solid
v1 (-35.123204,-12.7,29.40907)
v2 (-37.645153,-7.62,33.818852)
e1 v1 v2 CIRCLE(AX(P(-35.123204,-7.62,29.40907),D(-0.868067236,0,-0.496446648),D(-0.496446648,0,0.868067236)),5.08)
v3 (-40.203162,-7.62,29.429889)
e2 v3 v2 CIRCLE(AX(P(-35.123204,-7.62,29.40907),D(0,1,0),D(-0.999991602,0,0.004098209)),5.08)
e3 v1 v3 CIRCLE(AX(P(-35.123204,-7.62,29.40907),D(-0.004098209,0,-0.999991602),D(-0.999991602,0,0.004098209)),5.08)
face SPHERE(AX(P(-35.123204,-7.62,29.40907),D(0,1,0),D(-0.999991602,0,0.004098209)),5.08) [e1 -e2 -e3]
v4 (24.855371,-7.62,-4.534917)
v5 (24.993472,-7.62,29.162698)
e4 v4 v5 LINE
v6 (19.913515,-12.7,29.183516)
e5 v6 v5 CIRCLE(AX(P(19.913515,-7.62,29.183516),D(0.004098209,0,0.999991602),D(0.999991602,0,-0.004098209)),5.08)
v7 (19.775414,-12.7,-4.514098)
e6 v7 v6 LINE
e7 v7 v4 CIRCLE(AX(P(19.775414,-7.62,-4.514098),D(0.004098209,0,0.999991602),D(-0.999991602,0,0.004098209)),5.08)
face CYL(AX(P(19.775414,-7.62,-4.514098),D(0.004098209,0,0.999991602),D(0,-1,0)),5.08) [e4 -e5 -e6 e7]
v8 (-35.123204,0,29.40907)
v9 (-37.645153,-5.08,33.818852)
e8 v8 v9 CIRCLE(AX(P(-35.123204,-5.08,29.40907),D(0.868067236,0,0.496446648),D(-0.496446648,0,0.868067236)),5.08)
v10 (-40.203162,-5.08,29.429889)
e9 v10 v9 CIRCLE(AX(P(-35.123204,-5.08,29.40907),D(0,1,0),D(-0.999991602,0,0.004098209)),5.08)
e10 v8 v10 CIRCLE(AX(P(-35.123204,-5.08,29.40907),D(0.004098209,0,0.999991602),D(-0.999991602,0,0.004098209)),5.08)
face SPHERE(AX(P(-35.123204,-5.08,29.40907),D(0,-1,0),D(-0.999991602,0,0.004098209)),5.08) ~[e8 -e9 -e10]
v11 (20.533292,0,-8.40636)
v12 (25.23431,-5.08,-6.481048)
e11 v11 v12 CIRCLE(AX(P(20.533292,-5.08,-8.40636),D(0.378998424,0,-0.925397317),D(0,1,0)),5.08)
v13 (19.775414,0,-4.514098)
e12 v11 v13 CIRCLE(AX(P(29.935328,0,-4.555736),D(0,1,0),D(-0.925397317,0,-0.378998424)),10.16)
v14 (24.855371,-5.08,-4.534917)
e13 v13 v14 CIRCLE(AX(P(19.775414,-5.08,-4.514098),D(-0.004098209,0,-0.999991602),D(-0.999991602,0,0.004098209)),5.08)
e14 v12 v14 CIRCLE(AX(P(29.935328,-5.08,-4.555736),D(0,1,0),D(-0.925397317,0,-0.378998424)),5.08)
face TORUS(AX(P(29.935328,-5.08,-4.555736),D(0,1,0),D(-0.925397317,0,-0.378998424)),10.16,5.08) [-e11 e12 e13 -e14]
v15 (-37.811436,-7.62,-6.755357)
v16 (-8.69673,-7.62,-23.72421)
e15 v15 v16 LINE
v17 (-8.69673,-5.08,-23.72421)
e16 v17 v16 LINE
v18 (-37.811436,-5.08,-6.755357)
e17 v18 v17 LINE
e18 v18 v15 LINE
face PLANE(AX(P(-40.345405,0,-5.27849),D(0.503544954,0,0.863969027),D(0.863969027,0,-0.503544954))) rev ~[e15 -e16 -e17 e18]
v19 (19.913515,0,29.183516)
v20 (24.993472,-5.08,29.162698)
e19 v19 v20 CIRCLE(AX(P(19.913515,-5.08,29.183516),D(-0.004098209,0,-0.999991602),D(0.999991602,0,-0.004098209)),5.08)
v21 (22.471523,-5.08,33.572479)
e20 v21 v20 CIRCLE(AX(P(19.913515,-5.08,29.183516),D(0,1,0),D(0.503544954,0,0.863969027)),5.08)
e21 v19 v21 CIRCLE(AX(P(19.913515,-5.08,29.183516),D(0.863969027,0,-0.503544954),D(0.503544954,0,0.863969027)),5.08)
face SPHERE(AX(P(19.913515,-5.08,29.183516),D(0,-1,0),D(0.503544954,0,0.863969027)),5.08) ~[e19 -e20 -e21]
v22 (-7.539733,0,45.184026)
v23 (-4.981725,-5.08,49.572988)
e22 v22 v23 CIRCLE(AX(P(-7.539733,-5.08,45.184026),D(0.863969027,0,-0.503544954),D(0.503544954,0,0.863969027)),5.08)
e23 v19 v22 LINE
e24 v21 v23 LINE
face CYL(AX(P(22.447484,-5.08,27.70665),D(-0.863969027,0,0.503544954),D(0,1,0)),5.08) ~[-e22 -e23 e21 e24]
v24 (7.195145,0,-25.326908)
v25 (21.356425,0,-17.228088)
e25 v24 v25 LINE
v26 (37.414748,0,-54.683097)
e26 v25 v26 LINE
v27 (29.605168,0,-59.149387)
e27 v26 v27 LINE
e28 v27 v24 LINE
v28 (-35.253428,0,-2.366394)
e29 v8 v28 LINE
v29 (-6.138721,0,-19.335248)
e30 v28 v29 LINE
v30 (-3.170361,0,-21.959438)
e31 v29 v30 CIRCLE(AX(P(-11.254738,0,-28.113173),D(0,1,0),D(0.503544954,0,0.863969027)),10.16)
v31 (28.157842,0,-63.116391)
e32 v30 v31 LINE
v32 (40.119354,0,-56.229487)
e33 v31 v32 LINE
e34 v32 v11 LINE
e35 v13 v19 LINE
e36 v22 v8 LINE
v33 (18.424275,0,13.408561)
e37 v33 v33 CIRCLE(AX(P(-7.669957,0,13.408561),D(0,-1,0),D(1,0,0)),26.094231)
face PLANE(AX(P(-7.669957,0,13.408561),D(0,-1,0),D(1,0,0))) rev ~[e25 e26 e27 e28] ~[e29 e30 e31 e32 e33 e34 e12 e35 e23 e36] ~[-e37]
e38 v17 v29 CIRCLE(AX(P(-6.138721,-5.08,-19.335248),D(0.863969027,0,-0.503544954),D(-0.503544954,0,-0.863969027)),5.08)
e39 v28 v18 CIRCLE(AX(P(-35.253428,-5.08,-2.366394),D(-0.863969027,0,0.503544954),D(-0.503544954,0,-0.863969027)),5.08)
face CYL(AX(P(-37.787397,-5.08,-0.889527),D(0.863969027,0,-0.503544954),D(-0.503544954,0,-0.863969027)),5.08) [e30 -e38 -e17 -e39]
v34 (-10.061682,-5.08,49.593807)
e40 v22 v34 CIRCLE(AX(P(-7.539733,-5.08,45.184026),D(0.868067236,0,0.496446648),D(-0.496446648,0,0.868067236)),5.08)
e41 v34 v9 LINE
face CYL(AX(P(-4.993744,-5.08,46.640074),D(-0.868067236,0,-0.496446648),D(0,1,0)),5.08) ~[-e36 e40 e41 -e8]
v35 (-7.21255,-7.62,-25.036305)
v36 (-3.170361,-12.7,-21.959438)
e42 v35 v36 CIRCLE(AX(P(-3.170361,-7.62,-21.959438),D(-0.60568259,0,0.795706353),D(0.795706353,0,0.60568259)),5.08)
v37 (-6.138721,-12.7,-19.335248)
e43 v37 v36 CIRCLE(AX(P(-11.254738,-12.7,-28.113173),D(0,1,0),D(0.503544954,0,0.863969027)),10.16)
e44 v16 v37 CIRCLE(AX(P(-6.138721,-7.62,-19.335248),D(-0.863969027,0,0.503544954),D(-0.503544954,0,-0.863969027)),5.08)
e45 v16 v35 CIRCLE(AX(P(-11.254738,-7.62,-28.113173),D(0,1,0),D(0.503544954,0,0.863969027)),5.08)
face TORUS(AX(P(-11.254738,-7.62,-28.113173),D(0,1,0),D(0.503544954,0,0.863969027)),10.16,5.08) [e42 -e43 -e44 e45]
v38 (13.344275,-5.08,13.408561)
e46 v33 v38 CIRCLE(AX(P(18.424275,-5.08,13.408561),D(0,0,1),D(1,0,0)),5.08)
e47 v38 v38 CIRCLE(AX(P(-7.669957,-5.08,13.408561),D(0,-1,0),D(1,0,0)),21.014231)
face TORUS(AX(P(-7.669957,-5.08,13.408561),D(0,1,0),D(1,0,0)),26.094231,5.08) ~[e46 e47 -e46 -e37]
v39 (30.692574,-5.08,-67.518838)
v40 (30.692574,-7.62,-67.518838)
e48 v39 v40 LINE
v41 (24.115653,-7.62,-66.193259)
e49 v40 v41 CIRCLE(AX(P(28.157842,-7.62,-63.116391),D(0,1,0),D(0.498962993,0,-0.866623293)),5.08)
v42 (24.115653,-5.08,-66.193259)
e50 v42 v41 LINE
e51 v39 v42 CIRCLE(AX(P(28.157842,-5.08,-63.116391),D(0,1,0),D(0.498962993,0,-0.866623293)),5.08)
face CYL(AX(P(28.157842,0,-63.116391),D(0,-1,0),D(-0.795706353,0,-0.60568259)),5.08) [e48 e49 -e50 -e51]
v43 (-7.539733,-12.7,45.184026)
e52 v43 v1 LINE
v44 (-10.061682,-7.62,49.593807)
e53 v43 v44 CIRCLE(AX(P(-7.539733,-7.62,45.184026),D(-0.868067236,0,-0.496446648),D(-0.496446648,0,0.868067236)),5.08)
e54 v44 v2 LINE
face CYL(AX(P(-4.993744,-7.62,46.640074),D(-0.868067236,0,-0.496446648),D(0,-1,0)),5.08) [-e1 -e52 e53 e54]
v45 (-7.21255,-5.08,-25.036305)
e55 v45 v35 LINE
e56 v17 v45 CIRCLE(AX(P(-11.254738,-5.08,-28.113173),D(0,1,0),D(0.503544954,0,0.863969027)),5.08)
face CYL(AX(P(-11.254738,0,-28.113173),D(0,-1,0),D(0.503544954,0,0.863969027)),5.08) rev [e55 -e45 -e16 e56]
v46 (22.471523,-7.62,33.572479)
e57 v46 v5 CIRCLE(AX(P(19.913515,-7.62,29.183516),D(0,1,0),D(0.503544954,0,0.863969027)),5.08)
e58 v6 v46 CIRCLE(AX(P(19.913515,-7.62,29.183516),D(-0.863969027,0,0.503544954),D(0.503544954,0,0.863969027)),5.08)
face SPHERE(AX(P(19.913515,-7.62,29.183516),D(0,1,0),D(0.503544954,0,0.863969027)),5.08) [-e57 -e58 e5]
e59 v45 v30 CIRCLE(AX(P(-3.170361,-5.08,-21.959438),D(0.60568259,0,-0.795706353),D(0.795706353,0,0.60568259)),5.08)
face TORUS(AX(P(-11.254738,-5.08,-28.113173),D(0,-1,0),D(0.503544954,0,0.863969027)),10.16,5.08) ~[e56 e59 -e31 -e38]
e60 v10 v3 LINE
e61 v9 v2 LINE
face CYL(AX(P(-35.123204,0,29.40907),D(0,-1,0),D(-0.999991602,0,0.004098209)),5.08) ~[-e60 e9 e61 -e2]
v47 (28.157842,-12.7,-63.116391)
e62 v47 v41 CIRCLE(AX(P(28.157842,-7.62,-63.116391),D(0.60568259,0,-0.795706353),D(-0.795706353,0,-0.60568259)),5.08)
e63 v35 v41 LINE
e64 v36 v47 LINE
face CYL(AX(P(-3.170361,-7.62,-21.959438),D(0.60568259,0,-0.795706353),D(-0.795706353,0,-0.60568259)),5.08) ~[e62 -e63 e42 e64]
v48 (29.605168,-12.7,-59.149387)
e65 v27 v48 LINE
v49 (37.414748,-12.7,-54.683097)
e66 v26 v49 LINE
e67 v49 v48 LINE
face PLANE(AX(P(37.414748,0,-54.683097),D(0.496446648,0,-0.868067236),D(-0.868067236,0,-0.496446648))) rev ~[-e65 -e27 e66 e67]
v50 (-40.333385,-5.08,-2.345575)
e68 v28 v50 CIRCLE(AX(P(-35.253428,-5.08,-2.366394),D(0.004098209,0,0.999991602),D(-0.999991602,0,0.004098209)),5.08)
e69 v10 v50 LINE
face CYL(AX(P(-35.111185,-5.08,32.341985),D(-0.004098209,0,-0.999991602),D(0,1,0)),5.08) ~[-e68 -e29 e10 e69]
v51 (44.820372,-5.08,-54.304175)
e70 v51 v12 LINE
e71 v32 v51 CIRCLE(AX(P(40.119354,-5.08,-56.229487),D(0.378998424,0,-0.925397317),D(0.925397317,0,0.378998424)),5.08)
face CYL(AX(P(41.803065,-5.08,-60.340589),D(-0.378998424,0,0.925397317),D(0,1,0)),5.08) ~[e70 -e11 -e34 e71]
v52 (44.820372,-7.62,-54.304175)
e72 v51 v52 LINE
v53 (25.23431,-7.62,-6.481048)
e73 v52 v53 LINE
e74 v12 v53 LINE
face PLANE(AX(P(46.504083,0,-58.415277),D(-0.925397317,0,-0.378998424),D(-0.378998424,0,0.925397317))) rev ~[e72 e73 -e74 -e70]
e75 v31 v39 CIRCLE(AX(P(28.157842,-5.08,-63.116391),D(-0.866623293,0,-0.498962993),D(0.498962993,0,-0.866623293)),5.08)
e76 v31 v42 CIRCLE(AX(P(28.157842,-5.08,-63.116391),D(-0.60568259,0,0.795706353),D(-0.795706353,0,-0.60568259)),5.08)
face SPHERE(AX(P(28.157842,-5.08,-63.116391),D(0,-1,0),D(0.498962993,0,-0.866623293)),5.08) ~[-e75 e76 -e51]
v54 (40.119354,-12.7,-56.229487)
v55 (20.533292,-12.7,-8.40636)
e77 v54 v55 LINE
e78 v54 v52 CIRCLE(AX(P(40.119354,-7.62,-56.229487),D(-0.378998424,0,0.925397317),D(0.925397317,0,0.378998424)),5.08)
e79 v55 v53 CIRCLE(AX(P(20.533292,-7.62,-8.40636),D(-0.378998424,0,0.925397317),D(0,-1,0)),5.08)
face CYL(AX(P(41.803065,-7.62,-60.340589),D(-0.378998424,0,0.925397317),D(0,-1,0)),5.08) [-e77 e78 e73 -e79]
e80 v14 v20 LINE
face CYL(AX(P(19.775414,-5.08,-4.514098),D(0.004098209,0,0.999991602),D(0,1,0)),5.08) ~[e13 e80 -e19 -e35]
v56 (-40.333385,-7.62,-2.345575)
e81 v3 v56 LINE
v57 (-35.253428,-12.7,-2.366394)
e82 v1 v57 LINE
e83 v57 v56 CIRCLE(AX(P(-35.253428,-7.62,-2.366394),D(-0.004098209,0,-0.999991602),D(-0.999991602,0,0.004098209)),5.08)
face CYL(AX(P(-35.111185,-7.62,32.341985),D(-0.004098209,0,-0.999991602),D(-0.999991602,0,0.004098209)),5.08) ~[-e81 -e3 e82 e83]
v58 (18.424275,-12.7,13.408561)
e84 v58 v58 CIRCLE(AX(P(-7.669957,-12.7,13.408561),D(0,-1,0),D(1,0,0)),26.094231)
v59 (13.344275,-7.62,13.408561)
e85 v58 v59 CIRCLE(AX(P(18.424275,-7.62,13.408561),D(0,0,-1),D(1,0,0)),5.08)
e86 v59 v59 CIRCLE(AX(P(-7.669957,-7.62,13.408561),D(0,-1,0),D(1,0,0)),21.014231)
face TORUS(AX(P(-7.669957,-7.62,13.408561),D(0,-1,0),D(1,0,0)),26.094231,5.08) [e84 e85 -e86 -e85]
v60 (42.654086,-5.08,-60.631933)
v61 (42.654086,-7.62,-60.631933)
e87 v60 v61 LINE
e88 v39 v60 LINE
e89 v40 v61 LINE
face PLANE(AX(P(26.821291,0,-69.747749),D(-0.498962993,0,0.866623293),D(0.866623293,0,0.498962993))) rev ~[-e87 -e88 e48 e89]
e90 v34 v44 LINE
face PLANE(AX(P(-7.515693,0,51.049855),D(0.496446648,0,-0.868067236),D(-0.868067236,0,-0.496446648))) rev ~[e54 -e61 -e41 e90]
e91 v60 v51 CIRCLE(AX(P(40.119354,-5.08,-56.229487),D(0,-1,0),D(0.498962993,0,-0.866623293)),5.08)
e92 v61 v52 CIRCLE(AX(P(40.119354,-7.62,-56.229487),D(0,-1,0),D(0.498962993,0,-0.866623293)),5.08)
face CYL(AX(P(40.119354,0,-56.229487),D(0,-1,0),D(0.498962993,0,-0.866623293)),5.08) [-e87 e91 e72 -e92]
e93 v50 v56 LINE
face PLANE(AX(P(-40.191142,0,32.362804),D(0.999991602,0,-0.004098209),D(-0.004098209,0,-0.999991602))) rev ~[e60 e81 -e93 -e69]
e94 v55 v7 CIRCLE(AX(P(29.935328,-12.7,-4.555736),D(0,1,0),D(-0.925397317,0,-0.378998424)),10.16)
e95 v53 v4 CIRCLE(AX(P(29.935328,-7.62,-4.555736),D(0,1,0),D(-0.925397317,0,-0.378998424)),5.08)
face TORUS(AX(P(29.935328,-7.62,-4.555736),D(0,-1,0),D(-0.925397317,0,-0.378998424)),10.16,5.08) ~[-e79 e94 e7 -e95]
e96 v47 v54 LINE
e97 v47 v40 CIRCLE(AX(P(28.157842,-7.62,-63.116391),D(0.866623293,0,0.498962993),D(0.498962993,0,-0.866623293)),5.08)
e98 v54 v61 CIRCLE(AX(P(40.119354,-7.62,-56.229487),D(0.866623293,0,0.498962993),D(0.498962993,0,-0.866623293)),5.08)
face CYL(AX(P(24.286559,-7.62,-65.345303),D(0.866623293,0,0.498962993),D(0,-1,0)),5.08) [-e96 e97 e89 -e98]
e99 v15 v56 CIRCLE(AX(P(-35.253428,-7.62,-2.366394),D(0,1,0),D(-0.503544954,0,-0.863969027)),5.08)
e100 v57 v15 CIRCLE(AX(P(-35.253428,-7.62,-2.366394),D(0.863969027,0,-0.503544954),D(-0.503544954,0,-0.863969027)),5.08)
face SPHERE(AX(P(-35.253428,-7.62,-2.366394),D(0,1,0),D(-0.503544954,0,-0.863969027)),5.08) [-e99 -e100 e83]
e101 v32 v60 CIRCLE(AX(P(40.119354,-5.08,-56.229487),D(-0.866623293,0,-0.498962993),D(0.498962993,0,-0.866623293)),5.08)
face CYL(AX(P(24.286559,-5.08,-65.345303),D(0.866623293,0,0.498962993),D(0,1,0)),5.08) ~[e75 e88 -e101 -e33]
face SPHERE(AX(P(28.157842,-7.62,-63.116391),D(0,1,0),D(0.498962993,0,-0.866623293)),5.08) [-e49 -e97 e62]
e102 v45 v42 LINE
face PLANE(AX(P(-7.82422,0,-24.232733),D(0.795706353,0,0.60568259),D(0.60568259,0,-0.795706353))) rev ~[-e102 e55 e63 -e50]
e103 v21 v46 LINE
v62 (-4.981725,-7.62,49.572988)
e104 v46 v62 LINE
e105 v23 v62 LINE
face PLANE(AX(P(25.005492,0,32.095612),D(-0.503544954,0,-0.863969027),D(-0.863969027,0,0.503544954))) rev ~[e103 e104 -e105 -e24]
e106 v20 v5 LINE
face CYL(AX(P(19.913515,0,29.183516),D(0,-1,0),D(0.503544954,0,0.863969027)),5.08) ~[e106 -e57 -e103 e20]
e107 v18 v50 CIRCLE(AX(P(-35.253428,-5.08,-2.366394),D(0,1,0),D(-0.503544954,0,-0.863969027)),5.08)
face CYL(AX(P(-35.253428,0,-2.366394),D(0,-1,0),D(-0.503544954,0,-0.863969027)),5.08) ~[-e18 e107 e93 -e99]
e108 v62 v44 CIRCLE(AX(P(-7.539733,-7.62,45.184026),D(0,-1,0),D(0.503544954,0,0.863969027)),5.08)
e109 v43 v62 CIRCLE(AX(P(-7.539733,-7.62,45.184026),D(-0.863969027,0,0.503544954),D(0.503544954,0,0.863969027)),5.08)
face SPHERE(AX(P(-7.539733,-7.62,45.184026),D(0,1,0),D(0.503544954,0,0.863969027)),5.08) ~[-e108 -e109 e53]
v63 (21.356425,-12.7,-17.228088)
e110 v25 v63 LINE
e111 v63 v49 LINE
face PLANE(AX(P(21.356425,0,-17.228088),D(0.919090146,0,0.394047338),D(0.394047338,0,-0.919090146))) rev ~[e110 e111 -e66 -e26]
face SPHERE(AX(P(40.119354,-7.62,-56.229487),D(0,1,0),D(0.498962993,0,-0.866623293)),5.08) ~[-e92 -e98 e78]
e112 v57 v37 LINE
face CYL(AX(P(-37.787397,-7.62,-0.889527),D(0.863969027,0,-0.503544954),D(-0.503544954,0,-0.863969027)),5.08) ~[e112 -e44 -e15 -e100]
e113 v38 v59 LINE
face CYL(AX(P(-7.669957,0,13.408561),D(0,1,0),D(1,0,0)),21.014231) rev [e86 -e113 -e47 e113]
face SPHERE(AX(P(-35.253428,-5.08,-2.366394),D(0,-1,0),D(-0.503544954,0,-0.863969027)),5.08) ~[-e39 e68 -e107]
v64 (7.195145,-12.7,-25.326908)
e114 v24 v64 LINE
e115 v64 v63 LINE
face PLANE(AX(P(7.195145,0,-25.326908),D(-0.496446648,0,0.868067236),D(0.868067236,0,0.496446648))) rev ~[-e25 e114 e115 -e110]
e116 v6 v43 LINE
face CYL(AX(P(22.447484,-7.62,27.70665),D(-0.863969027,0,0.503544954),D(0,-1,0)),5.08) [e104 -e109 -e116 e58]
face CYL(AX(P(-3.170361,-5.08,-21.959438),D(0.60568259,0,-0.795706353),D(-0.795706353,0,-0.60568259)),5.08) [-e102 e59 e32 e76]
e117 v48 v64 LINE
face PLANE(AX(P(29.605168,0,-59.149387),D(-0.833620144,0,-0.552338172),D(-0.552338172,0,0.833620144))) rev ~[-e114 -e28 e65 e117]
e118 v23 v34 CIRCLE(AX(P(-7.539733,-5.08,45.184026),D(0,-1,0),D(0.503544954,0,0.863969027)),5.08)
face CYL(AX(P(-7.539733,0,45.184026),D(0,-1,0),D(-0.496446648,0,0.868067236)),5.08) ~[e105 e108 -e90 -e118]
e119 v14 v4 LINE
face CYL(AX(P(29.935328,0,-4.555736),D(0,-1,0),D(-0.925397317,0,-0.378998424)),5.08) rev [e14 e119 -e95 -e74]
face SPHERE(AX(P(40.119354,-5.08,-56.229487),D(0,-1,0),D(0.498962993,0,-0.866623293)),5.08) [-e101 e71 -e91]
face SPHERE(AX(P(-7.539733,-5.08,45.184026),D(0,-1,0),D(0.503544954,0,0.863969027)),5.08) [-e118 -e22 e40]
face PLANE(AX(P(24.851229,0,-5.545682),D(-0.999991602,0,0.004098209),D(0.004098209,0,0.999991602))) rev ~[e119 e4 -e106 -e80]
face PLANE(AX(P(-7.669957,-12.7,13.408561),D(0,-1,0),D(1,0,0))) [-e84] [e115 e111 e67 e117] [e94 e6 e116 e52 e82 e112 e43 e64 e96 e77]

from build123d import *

# Parameters (mm, degrees)
F0_R     = 21.014231477
F1_DEPTH = 12.7
F2_F1_R  = 5.08
F2_F2_R  = 5.08


with BuildPart() as f1:
    # F0 (on Front) → F1 (new body)
    with BuildSketch(Plane.XZ):
        Polygon((-7.8242197393, -24.2327329676), (24.8512287471, -5.5456817597), (25.0054919224, 32.0956123135), (-7.5156933887, 51.0498551788), (-40.1911418751, 32.3628039709), (-40.3454050504, -5.2784901024), align=None)
        with Locations((-7.669956564, 13.4085611056)):
            Circle(F0_R, mode=Mode.SUBTRACT)
        Polygon((46.5040828879, -58.4152766954), (24.8512287471, -5.5456817597), (-7.8242197393, -24.2327329676), (26.8212909929, -69.7477493281), align=None)
        Polygon((29.6051679054, -59.1493866598), (7.1951453574, -25.3269076347), (21.3564252001, -17.2280880668), (37.4147482216, -54.6830967069), align=None, mode=Mode.SUBTRACT)
    extrude(amount=F1_DEPTH)

    # F2: fillet of radius 5.08 on 22 edges, made by hand

    # F2_f1
    f2_f1_edges = [f1.edges().sort_by_distance(p)[0] for p in [
        (-7.8242197393, -6.35, -24.2327329676),
        (24.8512287471, -6.35, -5.5456817597),
    ]]
    fillet(f2_f1_edges, radius=F2_F1_R)

    # F2_f2
    f2_f2_edges = [f1.edges().sort_by_distance(p)[0] for p in [
        (-28.684188041, -12.7, 13.4085611056),
        (-40.3454050504, -6.35, -5.2784901024),
        (-24.5210673055, 0, -14.5013501528),
        (-24.5210673055, -12.7, -14.5013501528),
        (-40.1911418751, -6.35, 32.3628039709),
        (-40.2682734628, 0, 13.5421569342),
        (-40.2682734628, -12.7, 13.5421569342),
        (26.8212909929, -6.35, -69.7477493281),
        (46.5040828879, -6.35, -58.4152766954),
        (36.6626869404, 0, -64.0815130117),
        (36.6626869404, -12.7, -64.0815130117),
        (35.8691964804, 0, -32.4481624806),
        (35.8691964804, -12.7, -32.4481624806),
        (25.0054919224, -6.35, 32.0956123135),
        (-7.5156933887, -6.35, 51.0498551788),
        (8.7448992668, 0, 41.5727337462),
        (8.7448992668, -12.7, 41.5727337462),
        (-23.8534176319, 0, 41.7063295748),
        (-23.8534176319, -12.7, 41.7063295748),
        (-28.684188041, 0, 13.4085611056),
        (24.9489742828, -12.7, -5.5266493336),
        (24.9489742828, 0, -5.5266493336),
        (-7.8900615225, -12.7, -24.3072100781),
        (-7.8900615225, 0, -24.3072100781),
    ]]
    fillet(f2_f2_edges, radius=F2_F2_R)


solid = f1.part
